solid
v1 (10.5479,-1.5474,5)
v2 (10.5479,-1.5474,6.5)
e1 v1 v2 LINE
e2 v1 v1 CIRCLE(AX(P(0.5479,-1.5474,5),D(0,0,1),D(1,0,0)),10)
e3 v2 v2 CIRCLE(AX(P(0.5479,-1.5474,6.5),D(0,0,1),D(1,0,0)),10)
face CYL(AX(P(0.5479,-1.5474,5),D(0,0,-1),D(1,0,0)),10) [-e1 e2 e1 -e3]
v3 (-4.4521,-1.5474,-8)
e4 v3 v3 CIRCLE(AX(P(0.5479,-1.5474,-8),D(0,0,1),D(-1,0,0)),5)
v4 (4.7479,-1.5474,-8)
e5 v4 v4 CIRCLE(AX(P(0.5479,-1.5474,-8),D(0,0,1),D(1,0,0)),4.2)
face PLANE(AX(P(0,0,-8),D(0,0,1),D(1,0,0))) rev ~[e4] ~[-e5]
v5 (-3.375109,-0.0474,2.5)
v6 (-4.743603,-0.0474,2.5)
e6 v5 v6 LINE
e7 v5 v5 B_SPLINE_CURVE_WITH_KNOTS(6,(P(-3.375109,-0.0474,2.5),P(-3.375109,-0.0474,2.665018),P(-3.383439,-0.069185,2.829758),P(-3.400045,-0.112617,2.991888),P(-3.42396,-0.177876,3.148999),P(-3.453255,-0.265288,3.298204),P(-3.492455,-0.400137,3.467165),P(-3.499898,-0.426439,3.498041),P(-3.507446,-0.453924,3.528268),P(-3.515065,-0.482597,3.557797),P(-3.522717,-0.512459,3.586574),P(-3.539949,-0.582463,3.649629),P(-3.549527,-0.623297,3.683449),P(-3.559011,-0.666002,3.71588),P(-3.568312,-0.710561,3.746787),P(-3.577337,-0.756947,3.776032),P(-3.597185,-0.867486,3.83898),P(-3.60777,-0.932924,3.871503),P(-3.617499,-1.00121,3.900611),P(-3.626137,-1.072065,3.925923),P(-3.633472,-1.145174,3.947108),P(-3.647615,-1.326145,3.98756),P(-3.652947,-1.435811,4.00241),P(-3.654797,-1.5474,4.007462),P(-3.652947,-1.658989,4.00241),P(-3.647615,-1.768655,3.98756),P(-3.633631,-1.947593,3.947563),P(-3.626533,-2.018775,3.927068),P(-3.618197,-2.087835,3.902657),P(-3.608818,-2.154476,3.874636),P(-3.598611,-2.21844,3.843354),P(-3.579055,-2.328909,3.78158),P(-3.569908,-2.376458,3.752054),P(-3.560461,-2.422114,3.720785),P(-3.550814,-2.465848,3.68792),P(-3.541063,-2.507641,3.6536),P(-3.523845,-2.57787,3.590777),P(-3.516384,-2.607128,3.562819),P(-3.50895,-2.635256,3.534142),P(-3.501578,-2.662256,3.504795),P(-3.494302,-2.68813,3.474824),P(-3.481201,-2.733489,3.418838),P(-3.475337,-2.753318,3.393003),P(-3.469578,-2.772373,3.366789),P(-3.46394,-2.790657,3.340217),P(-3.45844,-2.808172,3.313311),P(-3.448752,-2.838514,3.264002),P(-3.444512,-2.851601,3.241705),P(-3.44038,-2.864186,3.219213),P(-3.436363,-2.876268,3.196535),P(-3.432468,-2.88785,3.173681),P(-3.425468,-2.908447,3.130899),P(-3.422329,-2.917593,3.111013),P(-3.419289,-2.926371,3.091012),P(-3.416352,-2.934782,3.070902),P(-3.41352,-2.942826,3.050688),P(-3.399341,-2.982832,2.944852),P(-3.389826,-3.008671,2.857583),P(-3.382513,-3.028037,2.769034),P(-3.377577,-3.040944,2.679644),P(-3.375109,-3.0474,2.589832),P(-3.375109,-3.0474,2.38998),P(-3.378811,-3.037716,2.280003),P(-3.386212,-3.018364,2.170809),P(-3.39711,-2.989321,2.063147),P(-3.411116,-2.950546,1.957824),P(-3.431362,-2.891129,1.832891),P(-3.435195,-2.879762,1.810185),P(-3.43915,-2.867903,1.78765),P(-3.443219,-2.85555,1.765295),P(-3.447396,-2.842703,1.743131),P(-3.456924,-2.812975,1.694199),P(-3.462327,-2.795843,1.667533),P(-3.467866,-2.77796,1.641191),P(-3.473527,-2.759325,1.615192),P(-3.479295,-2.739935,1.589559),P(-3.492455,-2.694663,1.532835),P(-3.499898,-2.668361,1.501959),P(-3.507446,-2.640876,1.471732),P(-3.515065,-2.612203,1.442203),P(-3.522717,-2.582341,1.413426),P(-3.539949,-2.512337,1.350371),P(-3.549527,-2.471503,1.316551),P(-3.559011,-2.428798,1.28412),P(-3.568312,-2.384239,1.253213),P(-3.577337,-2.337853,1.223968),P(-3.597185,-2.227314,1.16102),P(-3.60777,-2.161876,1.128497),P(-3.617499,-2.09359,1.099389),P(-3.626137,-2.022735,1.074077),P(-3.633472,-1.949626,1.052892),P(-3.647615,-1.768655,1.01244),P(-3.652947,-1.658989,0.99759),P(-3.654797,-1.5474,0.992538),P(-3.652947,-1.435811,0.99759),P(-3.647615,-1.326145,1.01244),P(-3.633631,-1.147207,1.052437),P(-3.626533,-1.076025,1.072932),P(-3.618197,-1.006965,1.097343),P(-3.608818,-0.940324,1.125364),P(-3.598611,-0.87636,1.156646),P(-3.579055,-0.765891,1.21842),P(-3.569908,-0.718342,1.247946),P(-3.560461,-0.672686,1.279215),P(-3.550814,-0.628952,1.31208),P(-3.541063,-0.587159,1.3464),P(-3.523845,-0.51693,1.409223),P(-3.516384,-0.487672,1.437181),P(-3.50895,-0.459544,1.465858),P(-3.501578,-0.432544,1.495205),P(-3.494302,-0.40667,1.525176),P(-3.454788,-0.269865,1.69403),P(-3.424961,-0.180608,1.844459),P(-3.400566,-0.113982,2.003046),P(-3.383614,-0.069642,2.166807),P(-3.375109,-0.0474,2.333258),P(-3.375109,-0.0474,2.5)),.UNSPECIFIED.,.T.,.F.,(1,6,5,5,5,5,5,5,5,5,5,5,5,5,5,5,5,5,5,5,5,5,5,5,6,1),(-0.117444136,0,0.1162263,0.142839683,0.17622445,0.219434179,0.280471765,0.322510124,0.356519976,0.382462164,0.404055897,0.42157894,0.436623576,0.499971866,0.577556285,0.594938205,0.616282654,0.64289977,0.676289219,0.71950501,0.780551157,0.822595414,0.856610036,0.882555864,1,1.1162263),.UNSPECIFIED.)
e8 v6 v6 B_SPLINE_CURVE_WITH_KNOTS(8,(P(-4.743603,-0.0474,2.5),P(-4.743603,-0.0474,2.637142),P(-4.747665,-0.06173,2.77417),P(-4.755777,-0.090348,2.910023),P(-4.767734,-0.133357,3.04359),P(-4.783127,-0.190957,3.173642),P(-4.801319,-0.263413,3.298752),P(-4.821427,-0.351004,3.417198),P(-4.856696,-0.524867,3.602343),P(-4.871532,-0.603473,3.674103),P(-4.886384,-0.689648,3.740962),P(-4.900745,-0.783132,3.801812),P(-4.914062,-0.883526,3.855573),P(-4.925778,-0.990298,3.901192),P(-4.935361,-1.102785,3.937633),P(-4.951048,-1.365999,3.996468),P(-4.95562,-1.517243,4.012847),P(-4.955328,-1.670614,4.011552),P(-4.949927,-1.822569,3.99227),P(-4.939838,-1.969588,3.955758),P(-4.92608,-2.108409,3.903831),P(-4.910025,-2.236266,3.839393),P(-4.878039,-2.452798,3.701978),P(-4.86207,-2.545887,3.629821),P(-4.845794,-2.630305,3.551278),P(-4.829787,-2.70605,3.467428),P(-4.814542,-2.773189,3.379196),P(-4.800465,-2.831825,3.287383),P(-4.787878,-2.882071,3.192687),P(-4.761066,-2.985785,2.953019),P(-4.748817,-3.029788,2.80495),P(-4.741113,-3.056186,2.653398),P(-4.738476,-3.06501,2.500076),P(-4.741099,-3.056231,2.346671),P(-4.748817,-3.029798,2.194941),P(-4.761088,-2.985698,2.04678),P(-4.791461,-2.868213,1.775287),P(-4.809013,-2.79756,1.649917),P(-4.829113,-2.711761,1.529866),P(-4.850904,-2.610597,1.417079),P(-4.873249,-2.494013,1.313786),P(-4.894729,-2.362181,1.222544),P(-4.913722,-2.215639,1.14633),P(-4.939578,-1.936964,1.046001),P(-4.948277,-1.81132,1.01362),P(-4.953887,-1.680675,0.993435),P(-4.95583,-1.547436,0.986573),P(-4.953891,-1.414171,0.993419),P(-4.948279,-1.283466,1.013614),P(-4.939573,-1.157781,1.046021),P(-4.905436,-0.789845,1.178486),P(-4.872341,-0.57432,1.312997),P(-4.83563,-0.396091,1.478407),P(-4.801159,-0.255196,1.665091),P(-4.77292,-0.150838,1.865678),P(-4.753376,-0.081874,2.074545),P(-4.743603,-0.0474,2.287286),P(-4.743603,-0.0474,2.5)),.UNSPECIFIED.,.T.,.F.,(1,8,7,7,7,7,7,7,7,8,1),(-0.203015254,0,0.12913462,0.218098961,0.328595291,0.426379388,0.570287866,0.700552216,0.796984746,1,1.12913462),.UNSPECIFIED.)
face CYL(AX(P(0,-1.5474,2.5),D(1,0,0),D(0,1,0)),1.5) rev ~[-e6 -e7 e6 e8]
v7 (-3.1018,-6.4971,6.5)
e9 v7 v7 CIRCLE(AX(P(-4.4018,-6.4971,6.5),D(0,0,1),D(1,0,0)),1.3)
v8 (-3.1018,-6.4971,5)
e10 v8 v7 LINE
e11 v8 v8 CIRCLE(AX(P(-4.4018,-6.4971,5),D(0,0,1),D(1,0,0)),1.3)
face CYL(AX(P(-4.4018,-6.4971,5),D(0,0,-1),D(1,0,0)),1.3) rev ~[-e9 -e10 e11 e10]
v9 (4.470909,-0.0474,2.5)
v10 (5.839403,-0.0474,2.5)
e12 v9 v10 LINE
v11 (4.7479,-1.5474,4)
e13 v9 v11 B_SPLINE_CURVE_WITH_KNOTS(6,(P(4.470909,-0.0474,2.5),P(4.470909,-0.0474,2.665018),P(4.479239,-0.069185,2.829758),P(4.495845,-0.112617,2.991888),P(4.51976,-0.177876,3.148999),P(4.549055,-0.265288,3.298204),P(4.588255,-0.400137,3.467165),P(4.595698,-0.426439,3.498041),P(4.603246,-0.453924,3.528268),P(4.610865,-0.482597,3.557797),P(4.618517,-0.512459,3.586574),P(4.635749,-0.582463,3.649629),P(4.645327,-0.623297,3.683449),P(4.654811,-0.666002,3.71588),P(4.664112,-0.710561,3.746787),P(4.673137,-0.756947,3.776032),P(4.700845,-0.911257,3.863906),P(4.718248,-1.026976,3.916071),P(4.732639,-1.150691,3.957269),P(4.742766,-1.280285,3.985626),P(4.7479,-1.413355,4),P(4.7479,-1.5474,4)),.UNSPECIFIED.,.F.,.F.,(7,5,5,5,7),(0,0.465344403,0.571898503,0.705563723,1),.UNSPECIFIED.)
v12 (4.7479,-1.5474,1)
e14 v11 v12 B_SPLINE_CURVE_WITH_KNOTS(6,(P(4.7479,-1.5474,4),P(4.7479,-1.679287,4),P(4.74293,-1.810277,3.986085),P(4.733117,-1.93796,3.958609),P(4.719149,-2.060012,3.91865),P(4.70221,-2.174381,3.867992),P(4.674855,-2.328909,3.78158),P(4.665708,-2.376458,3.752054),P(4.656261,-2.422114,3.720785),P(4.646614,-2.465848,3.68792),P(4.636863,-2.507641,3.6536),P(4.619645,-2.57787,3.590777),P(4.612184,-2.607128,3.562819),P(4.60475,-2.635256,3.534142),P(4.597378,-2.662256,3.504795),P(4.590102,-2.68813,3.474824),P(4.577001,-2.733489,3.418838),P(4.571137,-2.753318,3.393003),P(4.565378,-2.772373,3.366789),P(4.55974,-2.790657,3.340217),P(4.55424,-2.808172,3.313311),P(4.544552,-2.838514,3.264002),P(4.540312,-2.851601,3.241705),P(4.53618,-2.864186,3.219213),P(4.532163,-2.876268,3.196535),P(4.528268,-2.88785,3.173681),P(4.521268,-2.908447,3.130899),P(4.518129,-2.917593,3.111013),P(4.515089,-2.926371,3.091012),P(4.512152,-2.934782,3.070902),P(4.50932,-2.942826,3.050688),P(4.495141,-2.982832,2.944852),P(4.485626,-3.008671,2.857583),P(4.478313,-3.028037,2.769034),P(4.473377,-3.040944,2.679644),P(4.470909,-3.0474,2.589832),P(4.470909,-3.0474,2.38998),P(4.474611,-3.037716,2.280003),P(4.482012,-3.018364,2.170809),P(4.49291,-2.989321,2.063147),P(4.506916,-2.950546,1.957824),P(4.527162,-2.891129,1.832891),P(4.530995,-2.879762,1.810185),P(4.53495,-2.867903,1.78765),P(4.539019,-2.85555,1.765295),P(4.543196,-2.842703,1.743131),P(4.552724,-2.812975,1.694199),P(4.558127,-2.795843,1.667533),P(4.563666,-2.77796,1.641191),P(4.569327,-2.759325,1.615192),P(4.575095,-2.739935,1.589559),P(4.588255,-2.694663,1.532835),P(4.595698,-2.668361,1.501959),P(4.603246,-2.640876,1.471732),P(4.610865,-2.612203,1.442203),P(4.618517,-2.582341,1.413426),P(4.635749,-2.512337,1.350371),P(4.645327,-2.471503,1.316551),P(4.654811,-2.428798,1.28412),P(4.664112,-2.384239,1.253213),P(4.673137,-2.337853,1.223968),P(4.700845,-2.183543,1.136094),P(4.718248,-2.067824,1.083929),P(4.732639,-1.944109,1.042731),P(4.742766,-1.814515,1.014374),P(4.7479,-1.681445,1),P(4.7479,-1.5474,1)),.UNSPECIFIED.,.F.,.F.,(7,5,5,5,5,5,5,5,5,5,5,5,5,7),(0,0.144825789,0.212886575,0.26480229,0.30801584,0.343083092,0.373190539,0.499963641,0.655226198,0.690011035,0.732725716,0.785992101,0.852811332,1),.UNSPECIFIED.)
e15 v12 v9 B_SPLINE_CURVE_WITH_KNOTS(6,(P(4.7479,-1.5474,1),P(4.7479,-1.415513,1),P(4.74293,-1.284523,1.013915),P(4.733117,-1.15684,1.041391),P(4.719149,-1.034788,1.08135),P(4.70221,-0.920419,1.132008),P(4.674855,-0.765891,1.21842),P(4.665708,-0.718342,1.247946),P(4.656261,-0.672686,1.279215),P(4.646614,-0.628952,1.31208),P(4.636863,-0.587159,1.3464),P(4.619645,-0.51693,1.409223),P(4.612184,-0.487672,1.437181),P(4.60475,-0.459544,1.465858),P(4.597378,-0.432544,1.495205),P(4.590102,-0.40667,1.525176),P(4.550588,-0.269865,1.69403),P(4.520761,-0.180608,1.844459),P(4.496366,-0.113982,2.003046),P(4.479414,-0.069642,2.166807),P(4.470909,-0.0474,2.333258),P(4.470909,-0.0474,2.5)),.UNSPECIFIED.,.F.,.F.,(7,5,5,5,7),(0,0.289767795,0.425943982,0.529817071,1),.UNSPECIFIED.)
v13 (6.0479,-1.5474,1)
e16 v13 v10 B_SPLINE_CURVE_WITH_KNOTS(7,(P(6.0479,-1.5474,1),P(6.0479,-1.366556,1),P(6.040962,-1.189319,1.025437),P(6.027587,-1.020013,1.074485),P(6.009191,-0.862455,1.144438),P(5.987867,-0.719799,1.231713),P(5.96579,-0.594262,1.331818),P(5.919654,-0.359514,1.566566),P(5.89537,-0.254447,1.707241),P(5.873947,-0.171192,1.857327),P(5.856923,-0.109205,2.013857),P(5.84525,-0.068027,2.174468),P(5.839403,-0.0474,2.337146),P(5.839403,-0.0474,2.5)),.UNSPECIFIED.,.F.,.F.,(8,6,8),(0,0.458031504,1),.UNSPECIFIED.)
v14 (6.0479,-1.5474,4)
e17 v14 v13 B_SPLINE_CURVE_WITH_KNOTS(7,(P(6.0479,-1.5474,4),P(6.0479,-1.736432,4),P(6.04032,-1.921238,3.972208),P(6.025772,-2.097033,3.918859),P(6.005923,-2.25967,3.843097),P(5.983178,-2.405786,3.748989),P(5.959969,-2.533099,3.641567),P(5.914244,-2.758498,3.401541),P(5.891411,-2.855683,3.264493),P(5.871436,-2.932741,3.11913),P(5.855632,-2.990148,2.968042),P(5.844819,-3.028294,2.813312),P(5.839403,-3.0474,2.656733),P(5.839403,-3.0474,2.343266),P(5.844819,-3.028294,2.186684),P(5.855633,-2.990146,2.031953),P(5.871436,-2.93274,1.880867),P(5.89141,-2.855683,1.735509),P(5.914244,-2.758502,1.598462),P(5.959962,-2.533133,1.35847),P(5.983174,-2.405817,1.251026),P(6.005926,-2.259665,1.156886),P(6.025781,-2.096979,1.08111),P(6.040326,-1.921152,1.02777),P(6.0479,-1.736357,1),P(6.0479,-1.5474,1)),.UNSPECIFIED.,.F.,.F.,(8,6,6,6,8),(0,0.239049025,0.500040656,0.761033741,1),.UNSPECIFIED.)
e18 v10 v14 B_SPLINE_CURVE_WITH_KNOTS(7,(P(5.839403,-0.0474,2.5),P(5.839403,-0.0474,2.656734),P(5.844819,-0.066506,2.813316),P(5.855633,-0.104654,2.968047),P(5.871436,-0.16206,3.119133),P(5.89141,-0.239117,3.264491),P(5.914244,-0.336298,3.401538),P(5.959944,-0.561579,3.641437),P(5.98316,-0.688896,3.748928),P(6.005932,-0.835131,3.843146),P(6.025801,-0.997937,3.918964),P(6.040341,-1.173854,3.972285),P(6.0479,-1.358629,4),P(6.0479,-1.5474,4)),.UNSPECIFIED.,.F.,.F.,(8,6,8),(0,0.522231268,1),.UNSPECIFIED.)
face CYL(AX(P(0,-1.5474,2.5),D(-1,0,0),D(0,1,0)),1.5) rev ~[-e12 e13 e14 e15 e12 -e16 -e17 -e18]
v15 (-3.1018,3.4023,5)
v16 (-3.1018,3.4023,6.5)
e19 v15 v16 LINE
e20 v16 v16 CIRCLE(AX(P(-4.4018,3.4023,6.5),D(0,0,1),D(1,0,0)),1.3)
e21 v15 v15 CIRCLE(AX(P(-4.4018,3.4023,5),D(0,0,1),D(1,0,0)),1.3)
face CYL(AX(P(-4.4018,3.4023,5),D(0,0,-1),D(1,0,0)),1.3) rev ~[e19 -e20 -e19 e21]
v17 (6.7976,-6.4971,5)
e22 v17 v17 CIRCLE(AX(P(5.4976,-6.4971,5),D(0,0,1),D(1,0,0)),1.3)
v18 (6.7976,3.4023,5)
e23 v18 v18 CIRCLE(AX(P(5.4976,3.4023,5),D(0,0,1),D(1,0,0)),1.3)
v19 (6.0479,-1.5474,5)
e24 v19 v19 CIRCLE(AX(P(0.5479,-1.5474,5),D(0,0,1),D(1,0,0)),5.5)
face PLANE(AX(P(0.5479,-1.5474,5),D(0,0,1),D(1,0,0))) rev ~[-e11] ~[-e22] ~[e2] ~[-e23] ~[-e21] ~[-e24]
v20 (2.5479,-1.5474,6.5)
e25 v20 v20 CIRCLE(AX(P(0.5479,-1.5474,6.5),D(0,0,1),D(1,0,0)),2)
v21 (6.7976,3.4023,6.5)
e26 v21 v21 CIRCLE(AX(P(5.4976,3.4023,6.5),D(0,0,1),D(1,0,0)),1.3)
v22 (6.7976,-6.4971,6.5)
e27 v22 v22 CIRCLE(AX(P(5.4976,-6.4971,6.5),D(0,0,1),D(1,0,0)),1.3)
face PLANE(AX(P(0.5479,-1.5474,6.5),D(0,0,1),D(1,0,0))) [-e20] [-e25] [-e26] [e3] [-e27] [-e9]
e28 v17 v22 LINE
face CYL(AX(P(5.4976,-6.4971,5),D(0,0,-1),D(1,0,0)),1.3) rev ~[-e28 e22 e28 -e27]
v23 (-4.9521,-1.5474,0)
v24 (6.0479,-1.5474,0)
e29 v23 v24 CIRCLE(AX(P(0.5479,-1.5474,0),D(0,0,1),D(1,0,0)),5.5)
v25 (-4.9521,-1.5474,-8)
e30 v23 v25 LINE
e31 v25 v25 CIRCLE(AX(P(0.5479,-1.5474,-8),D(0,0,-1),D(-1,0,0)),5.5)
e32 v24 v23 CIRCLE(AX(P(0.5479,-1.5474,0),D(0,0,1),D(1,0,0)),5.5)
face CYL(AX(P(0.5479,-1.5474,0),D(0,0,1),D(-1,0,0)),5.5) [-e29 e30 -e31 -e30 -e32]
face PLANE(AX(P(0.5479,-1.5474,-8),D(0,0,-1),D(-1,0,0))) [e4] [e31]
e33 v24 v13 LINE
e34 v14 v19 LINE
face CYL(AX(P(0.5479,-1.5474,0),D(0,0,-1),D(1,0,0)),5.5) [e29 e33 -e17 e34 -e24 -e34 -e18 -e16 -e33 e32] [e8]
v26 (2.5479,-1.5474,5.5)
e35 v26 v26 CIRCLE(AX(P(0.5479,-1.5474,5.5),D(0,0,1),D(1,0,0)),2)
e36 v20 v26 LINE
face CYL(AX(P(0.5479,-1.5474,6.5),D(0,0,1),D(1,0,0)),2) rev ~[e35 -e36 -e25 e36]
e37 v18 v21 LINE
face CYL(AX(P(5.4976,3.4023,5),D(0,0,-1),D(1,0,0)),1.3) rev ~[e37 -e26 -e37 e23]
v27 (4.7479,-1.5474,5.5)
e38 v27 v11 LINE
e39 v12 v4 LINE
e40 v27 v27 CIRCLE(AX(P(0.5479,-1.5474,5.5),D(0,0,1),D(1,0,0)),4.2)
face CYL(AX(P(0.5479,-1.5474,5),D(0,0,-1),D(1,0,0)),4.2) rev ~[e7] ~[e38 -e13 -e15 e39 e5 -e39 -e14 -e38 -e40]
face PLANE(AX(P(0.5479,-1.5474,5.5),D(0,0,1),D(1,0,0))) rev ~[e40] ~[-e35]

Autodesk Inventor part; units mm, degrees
ref_plane "YZ Plane" through (0, 0, 0) normal (1, 0, 0) x (0, 1, 0)
ref_plane "XZ Plane" through (0, 0, 0) normal (0, 1, 0) x (-1, 0, 0)
ref_plane "XY Plane" through (0, 0, 0) normal (0, 0, 1) x (1, 0, 0)
sketch "스케치1" plane through (0, 0, 0) normal (0, 0, 1) x (1, 0, 0)
  circle A0 centre (0.5479, -1.5474) radius 5.5
  circle A1 centre (0.5479, -1.5474) radius 5
  circle A2 centre (0.5479, -1.5474) radius 4.2
  ellipse E0 centre (0.5479, -1.5474) end of major axis (-0.0909, -9.0201) minor radius 7.4992
  ellipse E1 centre (0.5479, -1.5474) end of major axis (-0.0912, -9.0201) minor radius 7.4991
  ellipse E2 centre (0.5479, -1.5474) end of major axis (1.2999, 2.3813) minor radius 3.9993 (-3.4513, -1.5143) -> (4.5471, -1.5804) ccw projected
  dimension "d0" = 10
  dimension "d1" = 8.4
  dimension "d24" = 11
extrude "돌출1" add sketch "스케치1" against normal blind 8 contours A1
sketch "스케치2" plane through (0.5479, -1.5474, 0) normal (0, 0, 1) x (1, 0, 0)
  circle A0 centre (0, 0) radius 4.2 projected
  circle A1 centre (0, 0) radius 5.5
  dimension "d4" = 11
extrude "돌출2" add sketch "스케치2" along normal blind 5
sketch "스케치3" plane through (0.5479, -1.5474, 5) normal (0, 0, 1) x (1, 0, 0)
  circle A0 centre (0, 0) radius 5.5 projected
  circle A1 centre (0, 0) radius 4.2 projected
  circle A2 centre (0, 0) radius 10
  circle A3 centre (4.9497, -4.9497) radius 1.3
  circle A4 centre (0, 0) radius 5 projected
  line L0 (0, 0) -> (0, -5.5) construction
  circle A5 centre (4.9497, 4.9497) radius 1.3
  circle A6 centre (-4.9497, 4.9497) radius 1.3
  circle A7 centre (-4.9497, -4.9497) radius 1.3
  dimension "d9" = 20
  dimension "d10" = 2.6
  dimension "d11" = 7
  dimension "d12" = 45
  dimension "d15" = 360
extrude "돌출3" add sketch "스케치3" along normal blind 1.5 contours A0 | A2 | A4
sketch "스케치4" plane through (0.5479, -1.5474, 6.5) normal (0, 0, 1) x (1, 0, 0)
  circle A0 centre (0, 0) radius 4.2 projected
  circle A1 centre (0, 0) radius 2
  dimension "d17" = 4
extrude "돌출4" add sketch "스케치4" against normal blind 1
sketch "스케치5" plane through (0, 0, 0) normal (1, 0, 0) x (0, 1, 0)
  circle A0 centre (-1.5474, 2.5) radius 1.5
  line L0 (3.9526, 0) -> (-7.0474, 0) projected
  line L1 (3.9526, 5) -> (-7.0474, 5) projected
  line L2 (3.9526, 0) -> (-7.0474, 0) projected
  line L3 (-7.0474, 0) -> (-7.0474, 5) projected
  line L4 (3.9526, 0) -> (3.9526, 5) projected
  point P0 (0, 0)
  point P1 (-1.5474, 5)
  dimension "d20" = 3
  dimension "d21" = 2.5
extrude "돌출5" cut sketch "스케치5" along normal through all both and the other way through all contours A0
sketch "스케치6" plane through (0.5479, -1.5474, 0) normal (0, 0, -1) x (-1, 0, 0)
  circle A0 centre (0, 0) radius 5.5 projected
  circle A1 centre (0, 0) radius 5 projected
  point P0 (0.5479, 1.5474)
extrude "돌출6" add sketch "스케치6" along normal blind 8
properties part number "SAFRS-P-0037"
